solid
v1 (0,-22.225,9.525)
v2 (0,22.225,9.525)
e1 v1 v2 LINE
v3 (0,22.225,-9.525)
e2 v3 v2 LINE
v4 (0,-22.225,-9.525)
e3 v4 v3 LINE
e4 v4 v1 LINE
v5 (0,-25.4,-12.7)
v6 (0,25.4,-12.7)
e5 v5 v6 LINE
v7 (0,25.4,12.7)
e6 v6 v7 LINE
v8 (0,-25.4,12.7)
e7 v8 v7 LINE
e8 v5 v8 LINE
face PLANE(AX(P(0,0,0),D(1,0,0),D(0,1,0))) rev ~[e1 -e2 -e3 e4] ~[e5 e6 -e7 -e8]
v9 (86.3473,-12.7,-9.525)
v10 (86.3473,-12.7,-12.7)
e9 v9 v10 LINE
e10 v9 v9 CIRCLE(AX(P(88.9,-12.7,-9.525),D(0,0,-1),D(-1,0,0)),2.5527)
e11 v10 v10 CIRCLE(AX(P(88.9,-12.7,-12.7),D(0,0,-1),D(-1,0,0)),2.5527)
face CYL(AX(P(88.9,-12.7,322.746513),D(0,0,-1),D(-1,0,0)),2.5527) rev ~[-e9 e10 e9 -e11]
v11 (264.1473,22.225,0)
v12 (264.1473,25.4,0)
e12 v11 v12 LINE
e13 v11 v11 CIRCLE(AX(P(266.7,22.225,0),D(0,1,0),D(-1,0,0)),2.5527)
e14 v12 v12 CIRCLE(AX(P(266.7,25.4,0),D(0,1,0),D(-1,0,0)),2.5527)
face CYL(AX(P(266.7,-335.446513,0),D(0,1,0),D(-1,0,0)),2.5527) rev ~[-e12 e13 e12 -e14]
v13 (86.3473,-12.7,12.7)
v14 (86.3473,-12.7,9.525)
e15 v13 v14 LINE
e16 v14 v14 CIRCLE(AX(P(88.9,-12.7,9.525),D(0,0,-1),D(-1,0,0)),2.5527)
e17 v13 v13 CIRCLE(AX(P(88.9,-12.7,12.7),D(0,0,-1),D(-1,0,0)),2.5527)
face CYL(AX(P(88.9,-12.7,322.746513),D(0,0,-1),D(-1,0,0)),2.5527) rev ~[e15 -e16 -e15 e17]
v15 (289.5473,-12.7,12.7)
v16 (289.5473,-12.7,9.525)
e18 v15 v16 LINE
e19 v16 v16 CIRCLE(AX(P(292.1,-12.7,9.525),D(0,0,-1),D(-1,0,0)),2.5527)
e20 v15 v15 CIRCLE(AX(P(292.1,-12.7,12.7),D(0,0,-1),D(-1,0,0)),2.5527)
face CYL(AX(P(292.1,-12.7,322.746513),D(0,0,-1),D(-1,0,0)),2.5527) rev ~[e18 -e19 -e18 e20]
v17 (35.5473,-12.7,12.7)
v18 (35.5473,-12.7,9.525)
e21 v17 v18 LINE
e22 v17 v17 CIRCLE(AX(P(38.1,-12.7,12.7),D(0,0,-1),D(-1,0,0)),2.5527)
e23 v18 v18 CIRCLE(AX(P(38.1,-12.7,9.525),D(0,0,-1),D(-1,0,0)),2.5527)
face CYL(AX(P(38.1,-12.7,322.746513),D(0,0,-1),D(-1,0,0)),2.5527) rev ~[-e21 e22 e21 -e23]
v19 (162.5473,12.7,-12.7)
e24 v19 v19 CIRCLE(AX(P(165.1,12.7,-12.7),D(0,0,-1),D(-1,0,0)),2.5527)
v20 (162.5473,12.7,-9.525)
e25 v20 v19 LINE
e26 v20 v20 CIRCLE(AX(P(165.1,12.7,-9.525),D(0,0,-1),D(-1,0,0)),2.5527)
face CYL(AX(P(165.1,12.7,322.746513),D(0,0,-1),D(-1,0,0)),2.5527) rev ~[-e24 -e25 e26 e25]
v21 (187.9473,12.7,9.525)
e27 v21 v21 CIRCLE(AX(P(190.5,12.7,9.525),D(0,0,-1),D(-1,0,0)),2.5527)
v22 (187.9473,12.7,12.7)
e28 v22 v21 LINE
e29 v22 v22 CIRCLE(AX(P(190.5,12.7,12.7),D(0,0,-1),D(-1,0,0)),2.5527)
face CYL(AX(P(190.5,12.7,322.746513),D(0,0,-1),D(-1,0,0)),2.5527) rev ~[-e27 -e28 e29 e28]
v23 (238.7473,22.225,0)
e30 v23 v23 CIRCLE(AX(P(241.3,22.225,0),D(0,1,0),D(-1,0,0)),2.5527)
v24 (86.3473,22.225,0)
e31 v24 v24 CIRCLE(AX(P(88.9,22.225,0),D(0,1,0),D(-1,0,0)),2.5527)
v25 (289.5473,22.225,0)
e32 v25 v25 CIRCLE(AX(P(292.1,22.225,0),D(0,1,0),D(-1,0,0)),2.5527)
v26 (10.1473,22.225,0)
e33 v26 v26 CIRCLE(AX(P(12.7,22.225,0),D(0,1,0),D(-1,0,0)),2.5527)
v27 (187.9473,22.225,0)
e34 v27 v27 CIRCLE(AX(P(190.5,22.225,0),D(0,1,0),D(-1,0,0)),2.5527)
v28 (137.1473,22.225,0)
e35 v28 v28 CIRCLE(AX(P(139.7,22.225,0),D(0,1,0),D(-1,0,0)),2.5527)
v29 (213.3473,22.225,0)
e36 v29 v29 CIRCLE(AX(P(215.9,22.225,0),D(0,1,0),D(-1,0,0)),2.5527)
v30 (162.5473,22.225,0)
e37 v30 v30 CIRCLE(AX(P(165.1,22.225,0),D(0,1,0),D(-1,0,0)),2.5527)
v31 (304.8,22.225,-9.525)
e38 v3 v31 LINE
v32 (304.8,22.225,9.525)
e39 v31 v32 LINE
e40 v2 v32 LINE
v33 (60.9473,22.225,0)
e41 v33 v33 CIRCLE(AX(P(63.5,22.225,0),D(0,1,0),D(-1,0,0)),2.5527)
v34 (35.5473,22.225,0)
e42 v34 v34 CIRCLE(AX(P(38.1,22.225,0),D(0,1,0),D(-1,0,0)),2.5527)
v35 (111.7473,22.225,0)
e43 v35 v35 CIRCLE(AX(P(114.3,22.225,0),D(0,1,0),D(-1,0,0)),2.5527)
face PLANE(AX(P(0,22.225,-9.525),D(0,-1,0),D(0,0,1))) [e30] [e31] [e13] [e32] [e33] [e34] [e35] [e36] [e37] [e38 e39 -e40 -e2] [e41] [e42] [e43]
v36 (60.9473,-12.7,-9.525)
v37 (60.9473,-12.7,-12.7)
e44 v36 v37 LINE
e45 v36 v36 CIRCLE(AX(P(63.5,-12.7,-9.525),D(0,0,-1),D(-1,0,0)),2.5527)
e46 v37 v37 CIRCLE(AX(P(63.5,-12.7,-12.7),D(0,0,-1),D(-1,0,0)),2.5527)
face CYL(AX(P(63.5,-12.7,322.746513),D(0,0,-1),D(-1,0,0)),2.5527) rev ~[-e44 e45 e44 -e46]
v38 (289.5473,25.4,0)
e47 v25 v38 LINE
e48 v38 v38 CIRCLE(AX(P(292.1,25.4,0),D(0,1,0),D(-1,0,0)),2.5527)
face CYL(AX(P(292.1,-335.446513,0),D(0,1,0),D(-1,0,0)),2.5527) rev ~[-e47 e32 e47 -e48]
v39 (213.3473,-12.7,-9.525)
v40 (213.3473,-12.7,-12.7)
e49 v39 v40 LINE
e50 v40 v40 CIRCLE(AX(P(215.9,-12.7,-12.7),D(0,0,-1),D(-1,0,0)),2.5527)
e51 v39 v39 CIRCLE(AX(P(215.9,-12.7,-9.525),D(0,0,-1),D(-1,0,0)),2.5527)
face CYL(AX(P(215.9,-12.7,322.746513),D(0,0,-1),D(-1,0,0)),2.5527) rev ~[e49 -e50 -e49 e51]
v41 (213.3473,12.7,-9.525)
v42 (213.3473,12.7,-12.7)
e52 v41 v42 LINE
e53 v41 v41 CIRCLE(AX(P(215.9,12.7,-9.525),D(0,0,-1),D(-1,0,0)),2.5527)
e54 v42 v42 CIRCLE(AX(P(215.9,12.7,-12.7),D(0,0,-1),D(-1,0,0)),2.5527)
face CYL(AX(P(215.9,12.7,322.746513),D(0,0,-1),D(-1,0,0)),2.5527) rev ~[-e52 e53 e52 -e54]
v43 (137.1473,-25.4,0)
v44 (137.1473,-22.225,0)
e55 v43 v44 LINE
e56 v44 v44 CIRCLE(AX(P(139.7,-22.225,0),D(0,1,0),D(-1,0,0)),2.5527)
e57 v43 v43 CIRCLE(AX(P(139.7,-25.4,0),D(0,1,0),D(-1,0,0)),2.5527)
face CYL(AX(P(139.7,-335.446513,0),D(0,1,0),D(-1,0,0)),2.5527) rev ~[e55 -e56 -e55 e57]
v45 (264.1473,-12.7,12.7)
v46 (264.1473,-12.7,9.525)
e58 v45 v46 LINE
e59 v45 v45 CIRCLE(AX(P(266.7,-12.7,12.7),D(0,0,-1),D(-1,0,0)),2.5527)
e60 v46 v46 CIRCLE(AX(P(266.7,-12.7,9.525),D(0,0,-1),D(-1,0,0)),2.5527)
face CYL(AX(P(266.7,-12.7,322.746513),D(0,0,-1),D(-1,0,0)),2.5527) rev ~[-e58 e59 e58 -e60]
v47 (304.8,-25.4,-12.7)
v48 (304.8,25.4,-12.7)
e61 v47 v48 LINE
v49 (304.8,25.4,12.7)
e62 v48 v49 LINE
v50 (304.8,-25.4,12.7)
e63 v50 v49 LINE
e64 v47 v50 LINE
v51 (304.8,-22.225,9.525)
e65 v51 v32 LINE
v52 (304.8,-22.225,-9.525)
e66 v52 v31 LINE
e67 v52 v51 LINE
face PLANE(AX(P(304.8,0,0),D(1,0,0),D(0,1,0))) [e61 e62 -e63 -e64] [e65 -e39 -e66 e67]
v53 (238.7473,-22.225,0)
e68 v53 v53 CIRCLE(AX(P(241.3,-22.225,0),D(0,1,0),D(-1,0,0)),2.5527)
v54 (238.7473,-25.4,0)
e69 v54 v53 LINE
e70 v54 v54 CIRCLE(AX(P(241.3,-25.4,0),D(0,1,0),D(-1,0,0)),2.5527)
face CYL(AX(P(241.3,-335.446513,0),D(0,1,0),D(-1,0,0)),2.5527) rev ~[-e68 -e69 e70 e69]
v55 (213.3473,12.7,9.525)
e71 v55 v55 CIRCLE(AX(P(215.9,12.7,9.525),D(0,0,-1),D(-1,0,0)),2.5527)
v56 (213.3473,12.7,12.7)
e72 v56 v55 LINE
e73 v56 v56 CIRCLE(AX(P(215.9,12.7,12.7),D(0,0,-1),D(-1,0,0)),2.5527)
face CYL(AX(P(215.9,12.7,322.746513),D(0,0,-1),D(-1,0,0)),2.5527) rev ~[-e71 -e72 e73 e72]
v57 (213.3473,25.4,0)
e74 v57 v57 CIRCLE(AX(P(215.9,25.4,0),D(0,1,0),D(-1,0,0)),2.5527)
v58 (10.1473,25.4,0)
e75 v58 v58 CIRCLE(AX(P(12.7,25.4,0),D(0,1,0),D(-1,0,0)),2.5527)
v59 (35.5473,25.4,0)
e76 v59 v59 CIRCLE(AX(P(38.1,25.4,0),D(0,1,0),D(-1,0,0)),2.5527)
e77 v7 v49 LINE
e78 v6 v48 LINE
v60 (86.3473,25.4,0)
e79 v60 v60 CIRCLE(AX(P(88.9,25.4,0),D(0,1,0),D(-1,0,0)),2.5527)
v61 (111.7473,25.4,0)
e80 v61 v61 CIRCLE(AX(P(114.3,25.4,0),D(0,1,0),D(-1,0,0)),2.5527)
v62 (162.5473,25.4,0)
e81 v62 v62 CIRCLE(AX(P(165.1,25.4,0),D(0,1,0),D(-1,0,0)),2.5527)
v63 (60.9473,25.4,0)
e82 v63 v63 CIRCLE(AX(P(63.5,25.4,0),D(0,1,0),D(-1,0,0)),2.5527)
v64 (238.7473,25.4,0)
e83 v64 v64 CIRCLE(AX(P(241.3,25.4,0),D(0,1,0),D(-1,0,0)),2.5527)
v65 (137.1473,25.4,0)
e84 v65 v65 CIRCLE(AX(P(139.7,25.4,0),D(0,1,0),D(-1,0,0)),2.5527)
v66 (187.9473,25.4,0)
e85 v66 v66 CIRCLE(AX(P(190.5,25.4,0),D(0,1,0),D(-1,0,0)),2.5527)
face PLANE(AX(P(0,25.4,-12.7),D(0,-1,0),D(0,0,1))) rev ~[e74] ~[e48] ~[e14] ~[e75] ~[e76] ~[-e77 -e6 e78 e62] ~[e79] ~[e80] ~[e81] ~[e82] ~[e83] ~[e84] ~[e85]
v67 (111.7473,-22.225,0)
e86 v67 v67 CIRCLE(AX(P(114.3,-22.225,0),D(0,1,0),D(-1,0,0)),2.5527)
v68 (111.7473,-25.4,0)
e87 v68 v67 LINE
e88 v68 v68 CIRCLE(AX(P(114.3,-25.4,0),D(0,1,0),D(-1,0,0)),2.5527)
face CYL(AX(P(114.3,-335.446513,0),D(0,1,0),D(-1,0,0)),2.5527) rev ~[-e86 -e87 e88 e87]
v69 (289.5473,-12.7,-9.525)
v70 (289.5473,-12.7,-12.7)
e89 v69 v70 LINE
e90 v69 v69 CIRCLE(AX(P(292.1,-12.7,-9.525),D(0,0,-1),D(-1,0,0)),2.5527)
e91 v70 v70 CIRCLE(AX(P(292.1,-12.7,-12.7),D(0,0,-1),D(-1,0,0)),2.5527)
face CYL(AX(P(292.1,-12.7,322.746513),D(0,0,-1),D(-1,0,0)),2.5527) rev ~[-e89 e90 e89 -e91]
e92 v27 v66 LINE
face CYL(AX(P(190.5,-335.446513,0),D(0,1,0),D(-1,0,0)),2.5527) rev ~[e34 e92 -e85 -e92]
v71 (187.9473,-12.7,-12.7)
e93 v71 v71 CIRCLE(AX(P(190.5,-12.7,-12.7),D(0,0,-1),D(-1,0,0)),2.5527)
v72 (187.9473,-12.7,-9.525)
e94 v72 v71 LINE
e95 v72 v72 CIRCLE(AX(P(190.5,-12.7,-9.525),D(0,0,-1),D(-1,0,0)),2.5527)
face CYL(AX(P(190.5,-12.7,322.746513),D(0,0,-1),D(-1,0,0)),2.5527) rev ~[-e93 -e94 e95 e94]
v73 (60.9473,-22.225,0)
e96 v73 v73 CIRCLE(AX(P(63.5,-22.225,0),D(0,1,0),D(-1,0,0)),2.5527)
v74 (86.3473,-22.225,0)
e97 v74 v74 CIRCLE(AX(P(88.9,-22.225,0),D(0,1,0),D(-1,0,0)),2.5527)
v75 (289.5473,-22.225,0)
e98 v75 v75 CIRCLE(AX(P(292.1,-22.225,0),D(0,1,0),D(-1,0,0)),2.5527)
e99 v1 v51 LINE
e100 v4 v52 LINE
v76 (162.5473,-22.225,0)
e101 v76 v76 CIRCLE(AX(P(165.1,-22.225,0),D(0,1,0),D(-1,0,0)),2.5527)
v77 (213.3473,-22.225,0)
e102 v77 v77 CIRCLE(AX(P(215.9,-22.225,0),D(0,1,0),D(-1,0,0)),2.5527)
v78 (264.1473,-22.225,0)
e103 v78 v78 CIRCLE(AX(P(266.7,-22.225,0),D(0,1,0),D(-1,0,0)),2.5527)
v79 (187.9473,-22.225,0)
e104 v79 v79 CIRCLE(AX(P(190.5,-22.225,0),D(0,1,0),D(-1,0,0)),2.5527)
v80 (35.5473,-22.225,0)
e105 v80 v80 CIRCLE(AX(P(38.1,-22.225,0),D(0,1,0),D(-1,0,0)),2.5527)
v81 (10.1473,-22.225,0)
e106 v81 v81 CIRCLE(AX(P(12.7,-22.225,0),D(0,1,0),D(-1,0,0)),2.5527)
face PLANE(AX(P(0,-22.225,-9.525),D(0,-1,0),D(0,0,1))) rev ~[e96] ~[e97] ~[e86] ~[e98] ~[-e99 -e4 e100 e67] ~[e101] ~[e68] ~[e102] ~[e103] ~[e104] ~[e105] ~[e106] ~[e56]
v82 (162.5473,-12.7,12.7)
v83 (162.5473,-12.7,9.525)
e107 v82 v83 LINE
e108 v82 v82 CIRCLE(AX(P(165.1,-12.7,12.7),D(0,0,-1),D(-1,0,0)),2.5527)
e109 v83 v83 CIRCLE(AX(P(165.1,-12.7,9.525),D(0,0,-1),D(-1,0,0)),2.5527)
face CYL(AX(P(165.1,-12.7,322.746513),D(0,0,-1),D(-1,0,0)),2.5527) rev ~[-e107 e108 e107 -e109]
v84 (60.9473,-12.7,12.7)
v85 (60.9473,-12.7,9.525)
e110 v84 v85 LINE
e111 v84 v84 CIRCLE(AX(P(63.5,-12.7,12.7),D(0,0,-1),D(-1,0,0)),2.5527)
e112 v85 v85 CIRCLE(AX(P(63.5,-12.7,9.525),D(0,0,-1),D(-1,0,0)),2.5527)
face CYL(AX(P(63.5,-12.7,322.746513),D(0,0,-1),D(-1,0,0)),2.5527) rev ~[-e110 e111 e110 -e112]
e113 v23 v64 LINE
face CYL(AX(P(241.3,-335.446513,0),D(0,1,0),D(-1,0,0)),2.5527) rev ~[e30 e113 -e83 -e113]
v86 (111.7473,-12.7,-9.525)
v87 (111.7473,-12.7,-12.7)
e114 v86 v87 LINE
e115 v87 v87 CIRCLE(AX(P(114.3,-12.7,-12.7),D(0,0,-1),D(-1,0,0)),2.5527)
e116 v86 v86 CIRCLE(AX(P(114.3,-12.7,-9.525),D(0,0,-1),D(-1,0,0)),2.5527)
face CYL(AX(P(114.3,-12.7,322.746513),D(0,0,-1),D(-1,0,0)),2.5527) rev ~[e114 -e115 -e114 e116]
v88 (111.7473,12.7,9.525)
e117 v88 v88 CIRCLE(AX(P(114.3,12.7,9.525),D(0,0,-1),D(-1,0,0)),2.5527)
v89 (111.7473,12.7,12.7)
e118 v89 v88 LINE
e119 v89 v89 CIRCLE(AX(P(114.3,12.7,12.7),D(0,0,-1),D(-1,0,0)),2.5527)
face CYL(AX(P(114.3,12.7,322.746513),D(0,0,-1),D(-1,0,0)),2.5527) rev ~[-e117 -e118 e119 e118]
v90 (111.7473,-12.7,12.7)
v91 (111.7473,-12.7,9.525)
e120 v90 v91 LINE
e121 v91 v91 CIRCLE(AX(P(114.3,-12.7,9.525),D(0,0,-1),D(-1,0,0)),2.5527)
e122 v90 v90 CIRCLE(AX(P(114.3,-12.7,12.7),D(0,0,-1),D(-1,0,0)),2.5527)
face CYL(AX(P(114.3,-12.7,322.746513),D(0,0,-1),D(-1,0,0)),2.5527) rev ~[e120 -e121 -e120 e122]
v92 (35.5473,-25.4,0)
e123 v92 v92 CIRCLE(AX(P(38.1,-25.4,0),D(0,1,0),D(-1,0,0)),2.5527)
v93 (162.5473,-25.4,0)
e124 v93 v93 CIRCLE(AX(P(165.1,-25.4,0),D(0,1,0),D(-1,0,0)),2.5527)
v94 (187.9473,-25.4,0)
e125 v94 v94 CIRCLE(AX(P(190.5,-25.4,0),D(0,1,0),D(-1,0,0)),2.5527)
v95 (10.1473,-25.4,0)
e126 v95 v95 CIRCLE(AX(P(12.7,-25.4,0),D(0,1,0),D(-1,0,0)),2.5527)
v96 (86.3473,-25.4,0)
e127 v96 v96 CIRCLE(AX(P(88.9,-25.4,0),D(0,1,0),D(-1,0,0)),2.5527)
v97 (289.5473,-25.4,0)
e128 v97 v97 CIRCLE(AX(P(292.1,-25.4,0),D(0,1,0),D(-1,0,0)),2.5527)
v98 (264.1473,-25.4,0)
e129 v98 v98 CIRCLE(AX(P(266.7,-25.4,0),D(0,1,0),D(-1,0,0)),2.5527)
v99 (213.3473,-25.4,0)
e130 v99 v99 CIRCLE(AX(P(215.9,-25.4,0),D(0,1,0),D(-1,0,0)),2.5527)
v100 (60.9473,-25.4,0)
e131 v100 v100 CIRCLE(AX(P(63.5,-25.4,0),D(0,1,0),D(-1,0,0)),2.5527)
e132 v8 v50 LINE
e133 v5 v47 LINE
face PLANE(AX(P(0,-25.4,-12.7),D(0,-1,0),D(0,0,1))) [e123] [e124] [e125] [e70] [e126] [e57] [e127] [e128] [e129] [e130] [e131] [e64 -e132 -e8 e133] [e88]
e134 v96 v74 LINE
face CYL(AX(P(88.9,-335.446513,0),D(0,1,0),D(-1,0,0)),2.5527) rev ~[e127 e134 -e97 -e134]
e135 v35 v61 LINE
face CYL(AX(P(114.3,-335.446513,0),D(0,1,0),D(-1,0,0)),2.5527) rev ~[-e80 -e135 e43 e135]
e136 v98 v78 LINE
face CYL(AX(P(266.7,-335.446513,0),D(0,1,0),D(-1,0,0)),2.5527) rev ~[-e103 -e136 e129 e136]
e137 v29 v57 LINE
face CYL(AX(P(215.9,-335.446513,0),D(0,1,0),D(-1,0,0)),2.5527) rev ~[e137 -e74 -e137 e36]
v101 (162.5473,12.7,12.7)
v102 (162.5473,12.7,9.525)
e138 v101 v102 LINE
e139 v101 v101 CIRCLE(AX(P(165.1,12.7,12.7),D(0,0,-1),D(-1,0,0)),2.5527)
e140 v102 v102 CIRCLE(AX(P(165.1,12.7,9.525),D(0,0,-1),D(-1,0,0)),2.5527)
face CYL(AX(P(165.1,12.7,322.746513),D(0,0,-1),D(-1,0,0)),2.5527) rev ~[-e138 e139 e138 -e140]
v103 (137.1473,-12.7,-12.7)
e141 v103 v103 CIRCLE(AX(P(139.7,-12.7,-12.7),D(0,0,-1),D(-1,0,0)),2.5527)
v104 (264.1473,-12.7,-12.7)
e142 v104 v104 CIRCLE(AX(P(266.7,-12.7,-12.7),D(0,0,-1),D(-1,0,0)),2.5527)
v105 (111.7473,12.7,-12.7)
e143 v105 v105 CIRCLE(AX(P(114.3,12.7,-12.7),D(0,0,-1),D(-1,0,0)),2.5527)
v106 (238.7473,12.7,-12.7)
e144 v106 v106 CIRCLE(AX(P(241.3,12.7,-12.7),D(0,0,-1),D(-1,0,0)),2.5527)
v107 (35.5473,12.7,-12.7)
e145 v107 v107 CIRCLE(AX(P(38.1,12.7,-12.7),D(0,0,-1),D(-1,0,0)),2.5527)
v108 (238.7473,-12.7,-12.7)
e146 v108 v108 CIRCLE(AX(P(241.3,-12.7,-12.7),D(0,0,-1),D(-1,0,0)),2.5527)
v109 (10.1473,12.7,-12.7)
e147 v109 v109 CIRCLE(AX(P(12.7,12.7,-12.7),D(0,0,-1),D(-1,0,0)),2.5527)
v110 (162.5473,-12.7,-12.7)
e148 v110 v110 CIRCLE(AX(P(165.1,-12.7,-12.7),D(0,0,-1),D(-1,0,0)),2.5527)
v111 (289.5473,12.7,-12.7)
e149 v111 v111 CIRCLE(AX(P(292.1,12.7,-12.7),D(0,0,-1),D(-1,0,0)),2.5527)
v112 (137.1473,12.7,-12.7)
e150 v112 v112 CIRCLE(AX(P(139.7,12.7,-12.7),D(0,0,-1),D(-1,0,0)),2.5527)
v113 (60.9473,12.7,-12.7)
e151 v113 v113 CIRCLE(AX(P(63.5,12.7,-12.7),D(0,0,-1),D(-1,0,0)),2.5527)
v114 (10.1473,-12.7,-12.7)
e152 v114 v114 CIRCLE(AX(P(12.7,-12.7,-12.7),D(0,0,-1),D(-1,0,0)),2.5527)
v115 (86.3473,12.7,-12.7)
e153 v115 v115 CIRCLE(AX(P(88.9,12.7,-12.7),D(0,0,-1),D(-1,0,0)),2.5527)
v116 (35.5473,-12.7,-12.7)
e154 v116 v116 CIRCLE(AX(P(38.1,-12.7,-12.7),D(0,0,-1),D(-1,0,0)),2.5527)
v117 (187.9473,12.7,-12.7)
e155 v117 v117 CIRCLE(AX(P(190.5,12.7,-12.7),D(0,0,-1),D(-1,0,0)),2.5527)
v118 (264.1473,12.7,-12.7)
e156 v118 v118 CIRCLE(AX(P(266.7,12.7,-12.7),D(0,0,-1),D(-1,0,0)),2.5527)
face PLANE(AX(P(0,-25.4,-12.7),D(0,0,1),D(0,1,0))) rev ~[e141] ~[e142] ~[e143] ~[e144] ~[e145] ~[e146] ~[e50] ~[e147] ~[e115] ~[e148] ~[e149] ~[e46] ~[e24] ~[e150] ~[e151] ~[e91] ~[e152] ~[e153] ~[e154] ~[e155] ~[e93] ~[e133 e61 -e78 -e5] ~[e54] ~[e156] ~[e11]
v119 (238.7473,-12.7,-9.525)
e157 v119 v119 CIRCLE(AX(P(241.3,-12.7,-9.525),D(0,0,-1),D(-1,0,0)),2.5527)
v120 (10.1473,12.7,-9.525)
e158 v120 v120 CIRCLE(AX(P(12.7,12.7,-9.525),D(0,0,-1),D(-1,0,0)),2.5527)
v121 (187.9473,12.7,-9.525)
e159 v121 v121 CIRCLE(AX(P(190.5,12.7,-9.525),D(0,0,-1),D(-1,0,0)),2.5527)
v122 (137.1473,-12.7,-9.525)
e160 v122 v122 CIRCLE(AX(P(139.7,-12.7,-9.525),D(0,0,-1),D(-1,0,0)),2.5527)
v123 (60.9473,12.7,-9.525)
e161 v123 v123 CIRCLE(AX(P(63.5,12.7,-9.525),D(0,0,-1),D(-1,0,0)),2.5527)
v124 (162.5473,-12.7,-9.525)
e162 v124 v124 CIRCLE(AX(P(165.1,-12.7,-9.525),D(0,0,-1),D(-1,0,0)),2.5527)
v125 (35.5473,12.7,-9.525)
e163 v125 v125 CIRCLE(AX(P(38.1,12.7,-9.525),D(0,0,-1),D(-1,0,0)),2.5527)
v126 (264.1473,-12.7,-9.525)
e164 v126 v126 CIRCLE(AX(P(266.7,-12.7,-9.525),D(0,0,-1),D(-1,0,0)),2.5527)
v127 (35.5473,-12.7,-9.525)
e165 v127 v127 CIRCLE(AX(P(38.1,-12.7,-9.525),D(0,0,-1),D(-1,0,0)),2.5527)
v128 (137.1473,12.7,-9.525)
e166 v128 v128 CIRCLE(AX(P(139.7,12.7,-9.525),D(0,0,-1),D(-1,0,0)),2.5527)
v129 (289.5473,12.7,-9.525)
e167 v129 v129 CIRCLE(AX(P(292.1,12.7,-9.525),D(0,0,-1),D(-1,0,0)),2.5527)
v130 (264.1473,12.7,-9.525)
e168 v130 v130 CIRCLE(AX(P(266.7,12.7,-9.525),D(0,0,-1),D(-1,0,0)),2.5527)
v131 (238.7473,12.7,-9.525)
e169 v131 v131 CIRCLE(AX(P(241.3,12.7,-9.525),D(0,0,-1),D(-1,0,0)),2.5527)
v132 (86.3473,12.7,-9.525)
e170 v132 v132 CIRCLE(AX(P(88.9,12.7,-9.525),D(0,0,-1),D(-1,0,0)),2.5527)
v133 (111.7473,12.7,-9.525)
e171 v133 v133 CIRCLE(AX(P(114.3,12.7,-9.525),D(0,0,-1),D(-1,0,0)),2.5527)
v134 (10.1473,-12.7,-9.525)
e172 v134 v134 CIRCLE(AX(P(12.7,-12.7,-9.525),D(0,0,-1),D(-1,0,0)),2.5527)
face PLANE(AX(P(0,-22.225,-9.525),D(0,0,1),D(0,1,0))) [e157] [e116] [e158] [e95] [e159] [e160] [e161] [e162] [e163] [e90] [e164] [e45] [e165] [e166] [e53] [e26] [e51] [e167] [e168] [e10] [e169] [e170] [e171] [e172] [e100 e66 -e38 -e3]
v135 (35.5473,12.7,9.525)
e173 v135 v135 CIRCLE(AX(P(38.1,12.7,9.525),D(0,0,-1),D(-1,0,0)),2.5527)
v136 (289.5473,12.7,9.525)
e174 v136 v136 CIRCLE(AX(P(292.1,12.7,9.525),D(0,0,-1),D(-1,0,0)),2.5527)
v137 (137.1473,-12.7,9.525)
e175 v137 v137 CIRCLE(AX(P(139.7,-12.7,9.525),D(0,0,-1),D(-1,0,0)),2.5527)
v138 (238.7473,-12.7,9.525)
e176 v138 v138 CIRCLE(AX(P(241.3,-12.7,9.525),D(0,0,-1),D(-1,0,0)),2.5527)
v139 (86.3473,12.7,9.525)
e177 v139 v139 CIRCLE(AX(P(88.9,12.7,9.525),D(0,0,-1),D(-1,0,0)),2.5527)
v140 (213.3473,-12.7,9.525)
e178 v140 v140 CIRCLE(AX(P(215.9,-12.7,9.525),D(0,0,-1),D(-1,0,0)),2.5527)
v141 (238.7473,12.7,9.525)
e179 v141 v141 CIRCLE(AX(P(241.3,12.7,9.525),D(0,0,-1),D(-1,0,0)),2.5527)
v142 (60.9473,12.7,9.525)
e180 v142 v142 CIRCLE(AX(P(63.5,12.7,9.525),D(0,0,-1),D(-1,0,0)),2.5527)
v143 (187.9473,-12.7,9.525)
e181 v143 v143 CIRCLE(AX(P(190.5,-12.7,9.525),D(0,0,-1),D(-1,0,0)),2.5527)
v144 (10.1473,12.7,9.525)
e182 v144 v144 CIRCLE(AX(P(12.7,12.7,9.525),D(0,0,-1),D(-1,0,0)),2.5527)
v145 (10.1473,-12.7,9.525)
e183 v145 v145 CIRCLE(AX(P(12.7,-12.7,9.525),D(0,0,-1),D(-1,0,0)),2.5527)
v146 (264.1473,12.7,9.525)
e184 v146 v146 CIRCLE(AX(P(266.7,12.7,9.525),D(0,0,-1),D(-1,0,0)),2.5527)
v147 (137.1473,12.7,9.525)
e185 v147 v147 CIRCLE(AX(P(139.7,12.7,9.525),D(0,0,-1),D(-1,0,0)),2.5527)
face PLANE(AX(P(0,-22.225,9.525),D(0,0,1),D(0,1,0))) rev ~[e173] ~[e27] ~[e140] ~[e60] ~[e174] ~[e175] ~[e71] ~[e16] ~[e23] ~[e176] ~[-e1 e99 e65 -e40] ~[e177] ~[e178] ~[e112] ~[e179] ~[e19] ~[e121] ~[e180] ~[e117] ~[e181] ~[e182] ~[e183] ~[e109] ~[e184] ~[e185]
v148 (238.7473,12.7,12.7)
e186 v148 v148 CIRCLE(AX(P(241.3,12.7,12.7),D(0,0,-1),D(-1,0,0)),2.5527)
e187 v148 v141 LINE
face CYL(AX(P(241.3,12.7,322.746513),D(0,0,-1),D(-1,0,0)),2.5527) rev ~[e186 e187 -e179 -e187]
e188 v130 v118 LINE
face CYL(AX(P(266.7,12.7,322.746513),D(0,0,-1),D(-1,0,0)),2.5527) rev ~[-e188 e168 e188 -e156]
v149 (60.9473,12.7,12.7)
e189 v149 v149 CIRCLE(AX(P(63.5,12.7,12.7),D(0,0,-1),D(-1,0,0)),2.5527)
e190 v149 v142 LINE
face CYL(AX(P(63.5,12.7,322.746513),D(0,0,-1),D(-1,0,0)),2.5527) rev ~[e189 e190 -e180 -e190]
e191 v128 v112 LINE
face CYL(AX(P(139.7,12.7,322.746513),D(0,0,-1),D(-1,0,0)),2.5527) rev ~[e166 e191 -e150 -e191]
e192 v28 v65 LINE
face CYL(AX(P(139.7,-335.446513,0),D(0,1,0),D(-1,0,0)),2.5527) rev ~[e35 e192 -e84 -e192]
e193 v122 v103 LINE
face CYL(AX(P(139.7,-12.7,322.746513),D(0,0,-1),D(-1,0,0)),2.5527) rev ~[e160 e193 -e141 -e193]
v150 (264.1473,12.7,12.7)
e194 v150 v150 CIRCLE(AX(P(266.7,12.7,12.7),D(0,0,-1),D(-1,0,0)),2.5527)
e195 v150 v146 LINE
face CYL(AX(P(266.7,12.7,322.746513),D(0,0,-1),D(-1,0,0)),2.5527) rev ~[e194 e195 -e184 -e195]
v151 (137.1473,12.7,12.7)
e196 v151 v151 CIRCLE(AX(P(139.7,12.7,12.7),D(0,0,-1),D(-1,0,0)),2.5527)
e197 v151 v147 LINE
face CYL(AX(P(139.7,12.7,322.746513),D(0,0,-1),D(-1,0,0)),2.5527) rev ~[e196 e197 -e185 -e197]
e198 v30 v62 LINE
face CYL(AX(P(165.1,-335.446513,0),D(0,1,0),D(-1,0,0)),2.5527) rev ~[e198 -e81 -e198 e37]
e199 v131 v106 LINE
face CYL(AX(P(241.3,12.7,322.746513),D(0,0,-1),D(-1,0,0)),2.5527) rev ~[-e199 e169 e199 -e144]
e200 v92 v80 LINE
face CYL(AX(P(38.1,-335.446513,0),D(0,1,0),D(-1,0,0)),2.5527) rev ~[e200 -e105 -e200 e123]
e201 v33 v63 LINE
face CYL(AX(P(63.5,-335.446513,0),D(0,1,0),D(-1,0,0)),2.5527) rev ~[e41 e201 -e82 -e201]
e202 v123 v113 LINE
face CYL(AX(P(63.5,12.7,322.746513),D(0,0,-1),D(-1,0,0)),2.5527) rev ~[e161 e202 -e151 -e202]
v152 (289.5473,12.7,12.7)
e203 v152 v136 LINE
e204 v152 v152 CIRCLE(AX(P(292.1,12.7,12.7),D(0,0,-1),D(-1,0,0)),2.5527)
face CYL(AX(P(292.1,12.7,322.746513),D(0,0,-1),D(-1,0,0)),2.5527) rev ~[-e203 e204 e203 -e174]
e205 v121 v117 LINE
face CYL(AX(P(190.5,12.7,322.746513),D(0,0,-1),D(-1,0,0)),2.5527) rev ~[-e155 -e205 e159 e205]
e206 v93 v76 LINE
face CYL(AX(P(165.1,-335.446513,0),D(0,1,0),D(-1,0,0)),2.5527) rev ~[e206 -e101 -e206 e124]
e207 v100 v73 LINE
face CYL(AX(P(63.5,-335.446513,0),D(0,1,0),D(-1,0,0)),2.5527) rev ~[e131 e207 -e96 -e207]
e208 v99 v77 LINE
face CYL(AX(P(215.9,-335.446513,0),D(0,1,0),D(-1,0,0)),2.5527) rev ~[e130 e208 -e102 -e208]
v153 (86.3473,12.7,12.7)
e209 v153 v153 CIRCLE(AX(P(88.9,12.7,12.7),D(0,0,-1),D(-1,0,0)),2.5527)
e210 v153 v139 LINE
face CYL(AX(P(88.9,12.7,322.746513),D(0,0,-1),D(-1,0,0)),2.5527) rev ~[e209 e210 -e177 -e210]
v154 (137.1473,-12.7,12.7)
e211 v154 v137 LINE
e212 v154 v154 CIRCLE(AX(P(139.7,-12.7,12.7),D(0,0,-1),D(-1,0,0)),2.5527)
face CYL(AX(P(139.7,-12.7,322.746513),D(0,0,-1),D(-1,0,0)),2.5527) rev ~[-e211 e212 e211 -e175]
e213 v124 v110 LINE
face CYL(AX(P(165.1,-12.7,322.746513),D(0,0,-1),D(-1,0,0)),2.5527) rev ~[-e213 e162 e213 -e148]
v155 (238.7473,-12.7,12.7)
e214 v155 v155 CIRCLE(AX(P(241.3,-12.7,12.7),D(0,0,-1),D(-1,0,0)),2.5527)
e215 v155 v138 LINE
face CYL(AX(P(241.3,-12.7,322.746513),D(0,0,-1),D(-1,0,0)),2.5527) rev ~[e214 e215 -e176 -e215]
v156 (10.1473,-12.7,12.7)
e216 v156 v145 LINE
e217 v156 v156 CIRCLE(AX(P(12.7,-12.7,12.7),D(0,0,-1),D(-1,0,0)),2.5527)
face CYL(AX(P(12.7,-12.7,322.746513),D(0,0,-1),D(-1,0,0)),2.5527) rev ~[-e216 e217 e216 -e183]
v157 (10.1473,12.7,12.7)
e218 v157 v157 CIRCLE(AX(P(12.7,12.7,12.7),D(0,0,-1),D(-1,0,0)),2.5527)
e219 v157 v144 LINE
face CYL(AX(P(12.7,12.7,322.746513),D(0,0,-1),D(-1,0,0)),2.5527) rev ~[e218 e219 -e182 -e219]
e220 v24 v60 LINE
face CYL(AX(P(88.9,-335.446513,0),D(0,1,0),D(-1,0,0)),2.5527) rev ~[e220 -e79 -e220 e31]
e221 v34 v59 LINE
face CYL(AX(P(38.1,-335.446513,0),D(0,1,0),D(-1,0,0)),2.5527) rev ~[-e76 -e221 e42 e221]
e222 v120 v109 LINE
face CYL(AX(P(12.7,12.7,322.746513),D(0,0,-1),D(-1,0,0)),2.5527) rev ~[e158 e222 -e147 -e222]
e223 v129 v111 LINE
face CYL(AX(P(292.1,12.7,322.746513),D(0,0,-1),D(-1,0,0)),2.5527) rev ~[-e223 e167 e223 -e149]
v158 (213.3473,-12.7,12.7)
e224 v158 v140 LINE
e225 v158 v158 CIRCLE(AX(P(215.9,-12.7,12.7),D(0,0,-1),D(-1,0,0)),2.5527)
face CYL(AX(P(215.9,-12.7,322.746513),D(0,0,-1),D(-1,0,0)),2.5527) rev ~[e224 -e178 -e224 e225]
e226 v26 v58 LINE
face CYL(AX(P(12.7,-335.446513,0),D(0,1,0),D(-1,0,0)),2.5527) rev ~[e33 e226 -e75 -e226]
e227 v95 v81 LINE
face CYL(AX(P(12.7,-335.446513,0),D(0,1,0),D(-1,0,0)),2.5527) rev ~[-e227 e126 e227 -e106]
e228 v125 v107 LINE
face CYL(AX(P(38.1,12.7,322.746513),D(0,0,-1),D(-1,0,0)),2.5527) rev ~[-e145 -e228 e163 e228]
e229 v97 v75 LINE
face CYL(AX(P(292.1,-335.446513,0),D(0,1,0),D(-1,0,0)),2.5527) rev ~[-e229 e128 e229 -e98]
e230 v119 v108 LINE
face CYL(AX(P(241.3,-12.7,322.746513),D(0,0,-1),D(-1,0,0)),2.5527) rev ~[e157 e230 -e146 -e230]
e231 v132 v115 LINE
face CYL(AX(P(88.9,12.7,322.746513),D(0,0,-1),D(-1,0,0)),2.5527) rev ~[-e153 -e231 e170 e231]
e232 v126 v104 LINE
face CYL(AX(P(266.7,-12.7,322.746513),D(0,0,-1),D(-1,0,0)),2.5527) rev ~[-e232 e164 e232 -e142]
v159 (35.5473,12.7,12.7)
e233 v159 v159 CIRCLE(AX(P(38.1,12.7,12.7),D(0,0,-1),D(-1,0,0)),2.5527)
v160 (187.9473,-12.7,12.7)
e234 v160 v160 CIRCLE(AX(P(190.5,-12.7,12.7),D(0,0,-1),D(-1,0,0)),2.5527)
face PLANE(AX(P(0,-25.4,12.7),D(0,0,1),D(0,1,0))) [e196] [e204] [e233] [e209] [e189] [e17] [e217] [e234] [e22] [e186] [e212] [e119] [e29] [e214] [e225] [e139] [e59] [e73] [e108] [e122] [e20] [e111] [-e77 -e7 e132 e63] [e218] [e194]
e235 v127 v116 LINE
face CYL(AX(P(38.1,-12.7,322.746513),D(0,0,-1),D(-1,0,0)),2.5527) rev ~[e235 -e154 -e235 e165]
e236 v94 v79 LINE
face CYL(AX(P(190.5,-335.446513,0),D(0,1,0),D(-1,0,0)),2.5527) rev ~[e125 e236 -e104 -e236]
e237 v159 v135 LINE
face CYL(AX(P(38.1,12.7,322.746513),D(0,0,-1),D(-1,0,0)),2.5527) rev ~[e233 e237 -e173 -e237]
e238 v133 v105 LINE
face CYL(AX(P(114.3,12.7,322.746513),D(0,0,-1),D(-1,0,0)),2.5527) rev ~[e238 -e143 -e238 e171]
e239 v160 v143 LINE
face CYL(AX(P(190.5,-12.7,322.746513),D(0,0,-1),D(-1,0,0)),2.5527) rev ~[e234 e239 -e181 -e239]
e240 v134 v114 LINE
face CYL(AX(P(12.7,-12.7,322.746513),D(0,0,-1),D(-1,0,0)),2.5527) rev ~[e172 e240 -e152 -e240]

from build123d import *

# Parameters (mm, degrees)
F0_W     = 50.8
F0_H     = 25.4
F0_W_2   = 44.45
F0_H_2   = 19.05
F1_DEPTH = 304.8
F3_D     = 5.1054
F5_D     = 5.1054


# Not quite as in the source:
# - a feature names something its author has since deleted; it is built from what else it names


with BuildPart() as f1:
    # F0 (on Right) → F1 (new body)
    with BuildSketch(Plane.YZ):
        Rectangle(F0_W, F0_H)
        Rectangle(F0_W_2, F0_H_2, mode=Mode.SUBTRACT)
    extrude(amount=F1_DEPTH)

    # F3 (through all)
    with Locations(Plane.XZ.offset(25.4)):
        with Locations((215.9, 0), (63.5, 0), (88.9, 0), (165.1, 0), (38.1, 0), (12.7, 0), (114.3, 0), (292.1, 0), (139.7, 0), (241.3, 0), (190.5, 0), (266.7, 0)):
            Hole(F3_D / 2)

    # F5 (through all)
    with Locations(Plane.XY.offset(12.7)):
        with Locations((114.3, 12.7), (38.1, -12.7), (63.5, 12.7), (38.1, 12.7), (88.9, -12.7), (266.7, -12.7), (215.9, 12.7), (139.7, -12.7), (63.5, -12.7), (190.5, 12.7), (241.3, -12.7), (114.3, -12.7), (12.7, 12.7), (292.1, 12.7), (12.7, -12.7), (190.5, -12.7), (88.9, 12.7), (241.3, 12.7), (165.1, -12.7), (165.1, 12.7), (139.7, 12.7), (266.7, 12.7), (292.1, -12.7), (215.9, -12.7)):
            Hole(F5_D / 2)


solid = f1.part
